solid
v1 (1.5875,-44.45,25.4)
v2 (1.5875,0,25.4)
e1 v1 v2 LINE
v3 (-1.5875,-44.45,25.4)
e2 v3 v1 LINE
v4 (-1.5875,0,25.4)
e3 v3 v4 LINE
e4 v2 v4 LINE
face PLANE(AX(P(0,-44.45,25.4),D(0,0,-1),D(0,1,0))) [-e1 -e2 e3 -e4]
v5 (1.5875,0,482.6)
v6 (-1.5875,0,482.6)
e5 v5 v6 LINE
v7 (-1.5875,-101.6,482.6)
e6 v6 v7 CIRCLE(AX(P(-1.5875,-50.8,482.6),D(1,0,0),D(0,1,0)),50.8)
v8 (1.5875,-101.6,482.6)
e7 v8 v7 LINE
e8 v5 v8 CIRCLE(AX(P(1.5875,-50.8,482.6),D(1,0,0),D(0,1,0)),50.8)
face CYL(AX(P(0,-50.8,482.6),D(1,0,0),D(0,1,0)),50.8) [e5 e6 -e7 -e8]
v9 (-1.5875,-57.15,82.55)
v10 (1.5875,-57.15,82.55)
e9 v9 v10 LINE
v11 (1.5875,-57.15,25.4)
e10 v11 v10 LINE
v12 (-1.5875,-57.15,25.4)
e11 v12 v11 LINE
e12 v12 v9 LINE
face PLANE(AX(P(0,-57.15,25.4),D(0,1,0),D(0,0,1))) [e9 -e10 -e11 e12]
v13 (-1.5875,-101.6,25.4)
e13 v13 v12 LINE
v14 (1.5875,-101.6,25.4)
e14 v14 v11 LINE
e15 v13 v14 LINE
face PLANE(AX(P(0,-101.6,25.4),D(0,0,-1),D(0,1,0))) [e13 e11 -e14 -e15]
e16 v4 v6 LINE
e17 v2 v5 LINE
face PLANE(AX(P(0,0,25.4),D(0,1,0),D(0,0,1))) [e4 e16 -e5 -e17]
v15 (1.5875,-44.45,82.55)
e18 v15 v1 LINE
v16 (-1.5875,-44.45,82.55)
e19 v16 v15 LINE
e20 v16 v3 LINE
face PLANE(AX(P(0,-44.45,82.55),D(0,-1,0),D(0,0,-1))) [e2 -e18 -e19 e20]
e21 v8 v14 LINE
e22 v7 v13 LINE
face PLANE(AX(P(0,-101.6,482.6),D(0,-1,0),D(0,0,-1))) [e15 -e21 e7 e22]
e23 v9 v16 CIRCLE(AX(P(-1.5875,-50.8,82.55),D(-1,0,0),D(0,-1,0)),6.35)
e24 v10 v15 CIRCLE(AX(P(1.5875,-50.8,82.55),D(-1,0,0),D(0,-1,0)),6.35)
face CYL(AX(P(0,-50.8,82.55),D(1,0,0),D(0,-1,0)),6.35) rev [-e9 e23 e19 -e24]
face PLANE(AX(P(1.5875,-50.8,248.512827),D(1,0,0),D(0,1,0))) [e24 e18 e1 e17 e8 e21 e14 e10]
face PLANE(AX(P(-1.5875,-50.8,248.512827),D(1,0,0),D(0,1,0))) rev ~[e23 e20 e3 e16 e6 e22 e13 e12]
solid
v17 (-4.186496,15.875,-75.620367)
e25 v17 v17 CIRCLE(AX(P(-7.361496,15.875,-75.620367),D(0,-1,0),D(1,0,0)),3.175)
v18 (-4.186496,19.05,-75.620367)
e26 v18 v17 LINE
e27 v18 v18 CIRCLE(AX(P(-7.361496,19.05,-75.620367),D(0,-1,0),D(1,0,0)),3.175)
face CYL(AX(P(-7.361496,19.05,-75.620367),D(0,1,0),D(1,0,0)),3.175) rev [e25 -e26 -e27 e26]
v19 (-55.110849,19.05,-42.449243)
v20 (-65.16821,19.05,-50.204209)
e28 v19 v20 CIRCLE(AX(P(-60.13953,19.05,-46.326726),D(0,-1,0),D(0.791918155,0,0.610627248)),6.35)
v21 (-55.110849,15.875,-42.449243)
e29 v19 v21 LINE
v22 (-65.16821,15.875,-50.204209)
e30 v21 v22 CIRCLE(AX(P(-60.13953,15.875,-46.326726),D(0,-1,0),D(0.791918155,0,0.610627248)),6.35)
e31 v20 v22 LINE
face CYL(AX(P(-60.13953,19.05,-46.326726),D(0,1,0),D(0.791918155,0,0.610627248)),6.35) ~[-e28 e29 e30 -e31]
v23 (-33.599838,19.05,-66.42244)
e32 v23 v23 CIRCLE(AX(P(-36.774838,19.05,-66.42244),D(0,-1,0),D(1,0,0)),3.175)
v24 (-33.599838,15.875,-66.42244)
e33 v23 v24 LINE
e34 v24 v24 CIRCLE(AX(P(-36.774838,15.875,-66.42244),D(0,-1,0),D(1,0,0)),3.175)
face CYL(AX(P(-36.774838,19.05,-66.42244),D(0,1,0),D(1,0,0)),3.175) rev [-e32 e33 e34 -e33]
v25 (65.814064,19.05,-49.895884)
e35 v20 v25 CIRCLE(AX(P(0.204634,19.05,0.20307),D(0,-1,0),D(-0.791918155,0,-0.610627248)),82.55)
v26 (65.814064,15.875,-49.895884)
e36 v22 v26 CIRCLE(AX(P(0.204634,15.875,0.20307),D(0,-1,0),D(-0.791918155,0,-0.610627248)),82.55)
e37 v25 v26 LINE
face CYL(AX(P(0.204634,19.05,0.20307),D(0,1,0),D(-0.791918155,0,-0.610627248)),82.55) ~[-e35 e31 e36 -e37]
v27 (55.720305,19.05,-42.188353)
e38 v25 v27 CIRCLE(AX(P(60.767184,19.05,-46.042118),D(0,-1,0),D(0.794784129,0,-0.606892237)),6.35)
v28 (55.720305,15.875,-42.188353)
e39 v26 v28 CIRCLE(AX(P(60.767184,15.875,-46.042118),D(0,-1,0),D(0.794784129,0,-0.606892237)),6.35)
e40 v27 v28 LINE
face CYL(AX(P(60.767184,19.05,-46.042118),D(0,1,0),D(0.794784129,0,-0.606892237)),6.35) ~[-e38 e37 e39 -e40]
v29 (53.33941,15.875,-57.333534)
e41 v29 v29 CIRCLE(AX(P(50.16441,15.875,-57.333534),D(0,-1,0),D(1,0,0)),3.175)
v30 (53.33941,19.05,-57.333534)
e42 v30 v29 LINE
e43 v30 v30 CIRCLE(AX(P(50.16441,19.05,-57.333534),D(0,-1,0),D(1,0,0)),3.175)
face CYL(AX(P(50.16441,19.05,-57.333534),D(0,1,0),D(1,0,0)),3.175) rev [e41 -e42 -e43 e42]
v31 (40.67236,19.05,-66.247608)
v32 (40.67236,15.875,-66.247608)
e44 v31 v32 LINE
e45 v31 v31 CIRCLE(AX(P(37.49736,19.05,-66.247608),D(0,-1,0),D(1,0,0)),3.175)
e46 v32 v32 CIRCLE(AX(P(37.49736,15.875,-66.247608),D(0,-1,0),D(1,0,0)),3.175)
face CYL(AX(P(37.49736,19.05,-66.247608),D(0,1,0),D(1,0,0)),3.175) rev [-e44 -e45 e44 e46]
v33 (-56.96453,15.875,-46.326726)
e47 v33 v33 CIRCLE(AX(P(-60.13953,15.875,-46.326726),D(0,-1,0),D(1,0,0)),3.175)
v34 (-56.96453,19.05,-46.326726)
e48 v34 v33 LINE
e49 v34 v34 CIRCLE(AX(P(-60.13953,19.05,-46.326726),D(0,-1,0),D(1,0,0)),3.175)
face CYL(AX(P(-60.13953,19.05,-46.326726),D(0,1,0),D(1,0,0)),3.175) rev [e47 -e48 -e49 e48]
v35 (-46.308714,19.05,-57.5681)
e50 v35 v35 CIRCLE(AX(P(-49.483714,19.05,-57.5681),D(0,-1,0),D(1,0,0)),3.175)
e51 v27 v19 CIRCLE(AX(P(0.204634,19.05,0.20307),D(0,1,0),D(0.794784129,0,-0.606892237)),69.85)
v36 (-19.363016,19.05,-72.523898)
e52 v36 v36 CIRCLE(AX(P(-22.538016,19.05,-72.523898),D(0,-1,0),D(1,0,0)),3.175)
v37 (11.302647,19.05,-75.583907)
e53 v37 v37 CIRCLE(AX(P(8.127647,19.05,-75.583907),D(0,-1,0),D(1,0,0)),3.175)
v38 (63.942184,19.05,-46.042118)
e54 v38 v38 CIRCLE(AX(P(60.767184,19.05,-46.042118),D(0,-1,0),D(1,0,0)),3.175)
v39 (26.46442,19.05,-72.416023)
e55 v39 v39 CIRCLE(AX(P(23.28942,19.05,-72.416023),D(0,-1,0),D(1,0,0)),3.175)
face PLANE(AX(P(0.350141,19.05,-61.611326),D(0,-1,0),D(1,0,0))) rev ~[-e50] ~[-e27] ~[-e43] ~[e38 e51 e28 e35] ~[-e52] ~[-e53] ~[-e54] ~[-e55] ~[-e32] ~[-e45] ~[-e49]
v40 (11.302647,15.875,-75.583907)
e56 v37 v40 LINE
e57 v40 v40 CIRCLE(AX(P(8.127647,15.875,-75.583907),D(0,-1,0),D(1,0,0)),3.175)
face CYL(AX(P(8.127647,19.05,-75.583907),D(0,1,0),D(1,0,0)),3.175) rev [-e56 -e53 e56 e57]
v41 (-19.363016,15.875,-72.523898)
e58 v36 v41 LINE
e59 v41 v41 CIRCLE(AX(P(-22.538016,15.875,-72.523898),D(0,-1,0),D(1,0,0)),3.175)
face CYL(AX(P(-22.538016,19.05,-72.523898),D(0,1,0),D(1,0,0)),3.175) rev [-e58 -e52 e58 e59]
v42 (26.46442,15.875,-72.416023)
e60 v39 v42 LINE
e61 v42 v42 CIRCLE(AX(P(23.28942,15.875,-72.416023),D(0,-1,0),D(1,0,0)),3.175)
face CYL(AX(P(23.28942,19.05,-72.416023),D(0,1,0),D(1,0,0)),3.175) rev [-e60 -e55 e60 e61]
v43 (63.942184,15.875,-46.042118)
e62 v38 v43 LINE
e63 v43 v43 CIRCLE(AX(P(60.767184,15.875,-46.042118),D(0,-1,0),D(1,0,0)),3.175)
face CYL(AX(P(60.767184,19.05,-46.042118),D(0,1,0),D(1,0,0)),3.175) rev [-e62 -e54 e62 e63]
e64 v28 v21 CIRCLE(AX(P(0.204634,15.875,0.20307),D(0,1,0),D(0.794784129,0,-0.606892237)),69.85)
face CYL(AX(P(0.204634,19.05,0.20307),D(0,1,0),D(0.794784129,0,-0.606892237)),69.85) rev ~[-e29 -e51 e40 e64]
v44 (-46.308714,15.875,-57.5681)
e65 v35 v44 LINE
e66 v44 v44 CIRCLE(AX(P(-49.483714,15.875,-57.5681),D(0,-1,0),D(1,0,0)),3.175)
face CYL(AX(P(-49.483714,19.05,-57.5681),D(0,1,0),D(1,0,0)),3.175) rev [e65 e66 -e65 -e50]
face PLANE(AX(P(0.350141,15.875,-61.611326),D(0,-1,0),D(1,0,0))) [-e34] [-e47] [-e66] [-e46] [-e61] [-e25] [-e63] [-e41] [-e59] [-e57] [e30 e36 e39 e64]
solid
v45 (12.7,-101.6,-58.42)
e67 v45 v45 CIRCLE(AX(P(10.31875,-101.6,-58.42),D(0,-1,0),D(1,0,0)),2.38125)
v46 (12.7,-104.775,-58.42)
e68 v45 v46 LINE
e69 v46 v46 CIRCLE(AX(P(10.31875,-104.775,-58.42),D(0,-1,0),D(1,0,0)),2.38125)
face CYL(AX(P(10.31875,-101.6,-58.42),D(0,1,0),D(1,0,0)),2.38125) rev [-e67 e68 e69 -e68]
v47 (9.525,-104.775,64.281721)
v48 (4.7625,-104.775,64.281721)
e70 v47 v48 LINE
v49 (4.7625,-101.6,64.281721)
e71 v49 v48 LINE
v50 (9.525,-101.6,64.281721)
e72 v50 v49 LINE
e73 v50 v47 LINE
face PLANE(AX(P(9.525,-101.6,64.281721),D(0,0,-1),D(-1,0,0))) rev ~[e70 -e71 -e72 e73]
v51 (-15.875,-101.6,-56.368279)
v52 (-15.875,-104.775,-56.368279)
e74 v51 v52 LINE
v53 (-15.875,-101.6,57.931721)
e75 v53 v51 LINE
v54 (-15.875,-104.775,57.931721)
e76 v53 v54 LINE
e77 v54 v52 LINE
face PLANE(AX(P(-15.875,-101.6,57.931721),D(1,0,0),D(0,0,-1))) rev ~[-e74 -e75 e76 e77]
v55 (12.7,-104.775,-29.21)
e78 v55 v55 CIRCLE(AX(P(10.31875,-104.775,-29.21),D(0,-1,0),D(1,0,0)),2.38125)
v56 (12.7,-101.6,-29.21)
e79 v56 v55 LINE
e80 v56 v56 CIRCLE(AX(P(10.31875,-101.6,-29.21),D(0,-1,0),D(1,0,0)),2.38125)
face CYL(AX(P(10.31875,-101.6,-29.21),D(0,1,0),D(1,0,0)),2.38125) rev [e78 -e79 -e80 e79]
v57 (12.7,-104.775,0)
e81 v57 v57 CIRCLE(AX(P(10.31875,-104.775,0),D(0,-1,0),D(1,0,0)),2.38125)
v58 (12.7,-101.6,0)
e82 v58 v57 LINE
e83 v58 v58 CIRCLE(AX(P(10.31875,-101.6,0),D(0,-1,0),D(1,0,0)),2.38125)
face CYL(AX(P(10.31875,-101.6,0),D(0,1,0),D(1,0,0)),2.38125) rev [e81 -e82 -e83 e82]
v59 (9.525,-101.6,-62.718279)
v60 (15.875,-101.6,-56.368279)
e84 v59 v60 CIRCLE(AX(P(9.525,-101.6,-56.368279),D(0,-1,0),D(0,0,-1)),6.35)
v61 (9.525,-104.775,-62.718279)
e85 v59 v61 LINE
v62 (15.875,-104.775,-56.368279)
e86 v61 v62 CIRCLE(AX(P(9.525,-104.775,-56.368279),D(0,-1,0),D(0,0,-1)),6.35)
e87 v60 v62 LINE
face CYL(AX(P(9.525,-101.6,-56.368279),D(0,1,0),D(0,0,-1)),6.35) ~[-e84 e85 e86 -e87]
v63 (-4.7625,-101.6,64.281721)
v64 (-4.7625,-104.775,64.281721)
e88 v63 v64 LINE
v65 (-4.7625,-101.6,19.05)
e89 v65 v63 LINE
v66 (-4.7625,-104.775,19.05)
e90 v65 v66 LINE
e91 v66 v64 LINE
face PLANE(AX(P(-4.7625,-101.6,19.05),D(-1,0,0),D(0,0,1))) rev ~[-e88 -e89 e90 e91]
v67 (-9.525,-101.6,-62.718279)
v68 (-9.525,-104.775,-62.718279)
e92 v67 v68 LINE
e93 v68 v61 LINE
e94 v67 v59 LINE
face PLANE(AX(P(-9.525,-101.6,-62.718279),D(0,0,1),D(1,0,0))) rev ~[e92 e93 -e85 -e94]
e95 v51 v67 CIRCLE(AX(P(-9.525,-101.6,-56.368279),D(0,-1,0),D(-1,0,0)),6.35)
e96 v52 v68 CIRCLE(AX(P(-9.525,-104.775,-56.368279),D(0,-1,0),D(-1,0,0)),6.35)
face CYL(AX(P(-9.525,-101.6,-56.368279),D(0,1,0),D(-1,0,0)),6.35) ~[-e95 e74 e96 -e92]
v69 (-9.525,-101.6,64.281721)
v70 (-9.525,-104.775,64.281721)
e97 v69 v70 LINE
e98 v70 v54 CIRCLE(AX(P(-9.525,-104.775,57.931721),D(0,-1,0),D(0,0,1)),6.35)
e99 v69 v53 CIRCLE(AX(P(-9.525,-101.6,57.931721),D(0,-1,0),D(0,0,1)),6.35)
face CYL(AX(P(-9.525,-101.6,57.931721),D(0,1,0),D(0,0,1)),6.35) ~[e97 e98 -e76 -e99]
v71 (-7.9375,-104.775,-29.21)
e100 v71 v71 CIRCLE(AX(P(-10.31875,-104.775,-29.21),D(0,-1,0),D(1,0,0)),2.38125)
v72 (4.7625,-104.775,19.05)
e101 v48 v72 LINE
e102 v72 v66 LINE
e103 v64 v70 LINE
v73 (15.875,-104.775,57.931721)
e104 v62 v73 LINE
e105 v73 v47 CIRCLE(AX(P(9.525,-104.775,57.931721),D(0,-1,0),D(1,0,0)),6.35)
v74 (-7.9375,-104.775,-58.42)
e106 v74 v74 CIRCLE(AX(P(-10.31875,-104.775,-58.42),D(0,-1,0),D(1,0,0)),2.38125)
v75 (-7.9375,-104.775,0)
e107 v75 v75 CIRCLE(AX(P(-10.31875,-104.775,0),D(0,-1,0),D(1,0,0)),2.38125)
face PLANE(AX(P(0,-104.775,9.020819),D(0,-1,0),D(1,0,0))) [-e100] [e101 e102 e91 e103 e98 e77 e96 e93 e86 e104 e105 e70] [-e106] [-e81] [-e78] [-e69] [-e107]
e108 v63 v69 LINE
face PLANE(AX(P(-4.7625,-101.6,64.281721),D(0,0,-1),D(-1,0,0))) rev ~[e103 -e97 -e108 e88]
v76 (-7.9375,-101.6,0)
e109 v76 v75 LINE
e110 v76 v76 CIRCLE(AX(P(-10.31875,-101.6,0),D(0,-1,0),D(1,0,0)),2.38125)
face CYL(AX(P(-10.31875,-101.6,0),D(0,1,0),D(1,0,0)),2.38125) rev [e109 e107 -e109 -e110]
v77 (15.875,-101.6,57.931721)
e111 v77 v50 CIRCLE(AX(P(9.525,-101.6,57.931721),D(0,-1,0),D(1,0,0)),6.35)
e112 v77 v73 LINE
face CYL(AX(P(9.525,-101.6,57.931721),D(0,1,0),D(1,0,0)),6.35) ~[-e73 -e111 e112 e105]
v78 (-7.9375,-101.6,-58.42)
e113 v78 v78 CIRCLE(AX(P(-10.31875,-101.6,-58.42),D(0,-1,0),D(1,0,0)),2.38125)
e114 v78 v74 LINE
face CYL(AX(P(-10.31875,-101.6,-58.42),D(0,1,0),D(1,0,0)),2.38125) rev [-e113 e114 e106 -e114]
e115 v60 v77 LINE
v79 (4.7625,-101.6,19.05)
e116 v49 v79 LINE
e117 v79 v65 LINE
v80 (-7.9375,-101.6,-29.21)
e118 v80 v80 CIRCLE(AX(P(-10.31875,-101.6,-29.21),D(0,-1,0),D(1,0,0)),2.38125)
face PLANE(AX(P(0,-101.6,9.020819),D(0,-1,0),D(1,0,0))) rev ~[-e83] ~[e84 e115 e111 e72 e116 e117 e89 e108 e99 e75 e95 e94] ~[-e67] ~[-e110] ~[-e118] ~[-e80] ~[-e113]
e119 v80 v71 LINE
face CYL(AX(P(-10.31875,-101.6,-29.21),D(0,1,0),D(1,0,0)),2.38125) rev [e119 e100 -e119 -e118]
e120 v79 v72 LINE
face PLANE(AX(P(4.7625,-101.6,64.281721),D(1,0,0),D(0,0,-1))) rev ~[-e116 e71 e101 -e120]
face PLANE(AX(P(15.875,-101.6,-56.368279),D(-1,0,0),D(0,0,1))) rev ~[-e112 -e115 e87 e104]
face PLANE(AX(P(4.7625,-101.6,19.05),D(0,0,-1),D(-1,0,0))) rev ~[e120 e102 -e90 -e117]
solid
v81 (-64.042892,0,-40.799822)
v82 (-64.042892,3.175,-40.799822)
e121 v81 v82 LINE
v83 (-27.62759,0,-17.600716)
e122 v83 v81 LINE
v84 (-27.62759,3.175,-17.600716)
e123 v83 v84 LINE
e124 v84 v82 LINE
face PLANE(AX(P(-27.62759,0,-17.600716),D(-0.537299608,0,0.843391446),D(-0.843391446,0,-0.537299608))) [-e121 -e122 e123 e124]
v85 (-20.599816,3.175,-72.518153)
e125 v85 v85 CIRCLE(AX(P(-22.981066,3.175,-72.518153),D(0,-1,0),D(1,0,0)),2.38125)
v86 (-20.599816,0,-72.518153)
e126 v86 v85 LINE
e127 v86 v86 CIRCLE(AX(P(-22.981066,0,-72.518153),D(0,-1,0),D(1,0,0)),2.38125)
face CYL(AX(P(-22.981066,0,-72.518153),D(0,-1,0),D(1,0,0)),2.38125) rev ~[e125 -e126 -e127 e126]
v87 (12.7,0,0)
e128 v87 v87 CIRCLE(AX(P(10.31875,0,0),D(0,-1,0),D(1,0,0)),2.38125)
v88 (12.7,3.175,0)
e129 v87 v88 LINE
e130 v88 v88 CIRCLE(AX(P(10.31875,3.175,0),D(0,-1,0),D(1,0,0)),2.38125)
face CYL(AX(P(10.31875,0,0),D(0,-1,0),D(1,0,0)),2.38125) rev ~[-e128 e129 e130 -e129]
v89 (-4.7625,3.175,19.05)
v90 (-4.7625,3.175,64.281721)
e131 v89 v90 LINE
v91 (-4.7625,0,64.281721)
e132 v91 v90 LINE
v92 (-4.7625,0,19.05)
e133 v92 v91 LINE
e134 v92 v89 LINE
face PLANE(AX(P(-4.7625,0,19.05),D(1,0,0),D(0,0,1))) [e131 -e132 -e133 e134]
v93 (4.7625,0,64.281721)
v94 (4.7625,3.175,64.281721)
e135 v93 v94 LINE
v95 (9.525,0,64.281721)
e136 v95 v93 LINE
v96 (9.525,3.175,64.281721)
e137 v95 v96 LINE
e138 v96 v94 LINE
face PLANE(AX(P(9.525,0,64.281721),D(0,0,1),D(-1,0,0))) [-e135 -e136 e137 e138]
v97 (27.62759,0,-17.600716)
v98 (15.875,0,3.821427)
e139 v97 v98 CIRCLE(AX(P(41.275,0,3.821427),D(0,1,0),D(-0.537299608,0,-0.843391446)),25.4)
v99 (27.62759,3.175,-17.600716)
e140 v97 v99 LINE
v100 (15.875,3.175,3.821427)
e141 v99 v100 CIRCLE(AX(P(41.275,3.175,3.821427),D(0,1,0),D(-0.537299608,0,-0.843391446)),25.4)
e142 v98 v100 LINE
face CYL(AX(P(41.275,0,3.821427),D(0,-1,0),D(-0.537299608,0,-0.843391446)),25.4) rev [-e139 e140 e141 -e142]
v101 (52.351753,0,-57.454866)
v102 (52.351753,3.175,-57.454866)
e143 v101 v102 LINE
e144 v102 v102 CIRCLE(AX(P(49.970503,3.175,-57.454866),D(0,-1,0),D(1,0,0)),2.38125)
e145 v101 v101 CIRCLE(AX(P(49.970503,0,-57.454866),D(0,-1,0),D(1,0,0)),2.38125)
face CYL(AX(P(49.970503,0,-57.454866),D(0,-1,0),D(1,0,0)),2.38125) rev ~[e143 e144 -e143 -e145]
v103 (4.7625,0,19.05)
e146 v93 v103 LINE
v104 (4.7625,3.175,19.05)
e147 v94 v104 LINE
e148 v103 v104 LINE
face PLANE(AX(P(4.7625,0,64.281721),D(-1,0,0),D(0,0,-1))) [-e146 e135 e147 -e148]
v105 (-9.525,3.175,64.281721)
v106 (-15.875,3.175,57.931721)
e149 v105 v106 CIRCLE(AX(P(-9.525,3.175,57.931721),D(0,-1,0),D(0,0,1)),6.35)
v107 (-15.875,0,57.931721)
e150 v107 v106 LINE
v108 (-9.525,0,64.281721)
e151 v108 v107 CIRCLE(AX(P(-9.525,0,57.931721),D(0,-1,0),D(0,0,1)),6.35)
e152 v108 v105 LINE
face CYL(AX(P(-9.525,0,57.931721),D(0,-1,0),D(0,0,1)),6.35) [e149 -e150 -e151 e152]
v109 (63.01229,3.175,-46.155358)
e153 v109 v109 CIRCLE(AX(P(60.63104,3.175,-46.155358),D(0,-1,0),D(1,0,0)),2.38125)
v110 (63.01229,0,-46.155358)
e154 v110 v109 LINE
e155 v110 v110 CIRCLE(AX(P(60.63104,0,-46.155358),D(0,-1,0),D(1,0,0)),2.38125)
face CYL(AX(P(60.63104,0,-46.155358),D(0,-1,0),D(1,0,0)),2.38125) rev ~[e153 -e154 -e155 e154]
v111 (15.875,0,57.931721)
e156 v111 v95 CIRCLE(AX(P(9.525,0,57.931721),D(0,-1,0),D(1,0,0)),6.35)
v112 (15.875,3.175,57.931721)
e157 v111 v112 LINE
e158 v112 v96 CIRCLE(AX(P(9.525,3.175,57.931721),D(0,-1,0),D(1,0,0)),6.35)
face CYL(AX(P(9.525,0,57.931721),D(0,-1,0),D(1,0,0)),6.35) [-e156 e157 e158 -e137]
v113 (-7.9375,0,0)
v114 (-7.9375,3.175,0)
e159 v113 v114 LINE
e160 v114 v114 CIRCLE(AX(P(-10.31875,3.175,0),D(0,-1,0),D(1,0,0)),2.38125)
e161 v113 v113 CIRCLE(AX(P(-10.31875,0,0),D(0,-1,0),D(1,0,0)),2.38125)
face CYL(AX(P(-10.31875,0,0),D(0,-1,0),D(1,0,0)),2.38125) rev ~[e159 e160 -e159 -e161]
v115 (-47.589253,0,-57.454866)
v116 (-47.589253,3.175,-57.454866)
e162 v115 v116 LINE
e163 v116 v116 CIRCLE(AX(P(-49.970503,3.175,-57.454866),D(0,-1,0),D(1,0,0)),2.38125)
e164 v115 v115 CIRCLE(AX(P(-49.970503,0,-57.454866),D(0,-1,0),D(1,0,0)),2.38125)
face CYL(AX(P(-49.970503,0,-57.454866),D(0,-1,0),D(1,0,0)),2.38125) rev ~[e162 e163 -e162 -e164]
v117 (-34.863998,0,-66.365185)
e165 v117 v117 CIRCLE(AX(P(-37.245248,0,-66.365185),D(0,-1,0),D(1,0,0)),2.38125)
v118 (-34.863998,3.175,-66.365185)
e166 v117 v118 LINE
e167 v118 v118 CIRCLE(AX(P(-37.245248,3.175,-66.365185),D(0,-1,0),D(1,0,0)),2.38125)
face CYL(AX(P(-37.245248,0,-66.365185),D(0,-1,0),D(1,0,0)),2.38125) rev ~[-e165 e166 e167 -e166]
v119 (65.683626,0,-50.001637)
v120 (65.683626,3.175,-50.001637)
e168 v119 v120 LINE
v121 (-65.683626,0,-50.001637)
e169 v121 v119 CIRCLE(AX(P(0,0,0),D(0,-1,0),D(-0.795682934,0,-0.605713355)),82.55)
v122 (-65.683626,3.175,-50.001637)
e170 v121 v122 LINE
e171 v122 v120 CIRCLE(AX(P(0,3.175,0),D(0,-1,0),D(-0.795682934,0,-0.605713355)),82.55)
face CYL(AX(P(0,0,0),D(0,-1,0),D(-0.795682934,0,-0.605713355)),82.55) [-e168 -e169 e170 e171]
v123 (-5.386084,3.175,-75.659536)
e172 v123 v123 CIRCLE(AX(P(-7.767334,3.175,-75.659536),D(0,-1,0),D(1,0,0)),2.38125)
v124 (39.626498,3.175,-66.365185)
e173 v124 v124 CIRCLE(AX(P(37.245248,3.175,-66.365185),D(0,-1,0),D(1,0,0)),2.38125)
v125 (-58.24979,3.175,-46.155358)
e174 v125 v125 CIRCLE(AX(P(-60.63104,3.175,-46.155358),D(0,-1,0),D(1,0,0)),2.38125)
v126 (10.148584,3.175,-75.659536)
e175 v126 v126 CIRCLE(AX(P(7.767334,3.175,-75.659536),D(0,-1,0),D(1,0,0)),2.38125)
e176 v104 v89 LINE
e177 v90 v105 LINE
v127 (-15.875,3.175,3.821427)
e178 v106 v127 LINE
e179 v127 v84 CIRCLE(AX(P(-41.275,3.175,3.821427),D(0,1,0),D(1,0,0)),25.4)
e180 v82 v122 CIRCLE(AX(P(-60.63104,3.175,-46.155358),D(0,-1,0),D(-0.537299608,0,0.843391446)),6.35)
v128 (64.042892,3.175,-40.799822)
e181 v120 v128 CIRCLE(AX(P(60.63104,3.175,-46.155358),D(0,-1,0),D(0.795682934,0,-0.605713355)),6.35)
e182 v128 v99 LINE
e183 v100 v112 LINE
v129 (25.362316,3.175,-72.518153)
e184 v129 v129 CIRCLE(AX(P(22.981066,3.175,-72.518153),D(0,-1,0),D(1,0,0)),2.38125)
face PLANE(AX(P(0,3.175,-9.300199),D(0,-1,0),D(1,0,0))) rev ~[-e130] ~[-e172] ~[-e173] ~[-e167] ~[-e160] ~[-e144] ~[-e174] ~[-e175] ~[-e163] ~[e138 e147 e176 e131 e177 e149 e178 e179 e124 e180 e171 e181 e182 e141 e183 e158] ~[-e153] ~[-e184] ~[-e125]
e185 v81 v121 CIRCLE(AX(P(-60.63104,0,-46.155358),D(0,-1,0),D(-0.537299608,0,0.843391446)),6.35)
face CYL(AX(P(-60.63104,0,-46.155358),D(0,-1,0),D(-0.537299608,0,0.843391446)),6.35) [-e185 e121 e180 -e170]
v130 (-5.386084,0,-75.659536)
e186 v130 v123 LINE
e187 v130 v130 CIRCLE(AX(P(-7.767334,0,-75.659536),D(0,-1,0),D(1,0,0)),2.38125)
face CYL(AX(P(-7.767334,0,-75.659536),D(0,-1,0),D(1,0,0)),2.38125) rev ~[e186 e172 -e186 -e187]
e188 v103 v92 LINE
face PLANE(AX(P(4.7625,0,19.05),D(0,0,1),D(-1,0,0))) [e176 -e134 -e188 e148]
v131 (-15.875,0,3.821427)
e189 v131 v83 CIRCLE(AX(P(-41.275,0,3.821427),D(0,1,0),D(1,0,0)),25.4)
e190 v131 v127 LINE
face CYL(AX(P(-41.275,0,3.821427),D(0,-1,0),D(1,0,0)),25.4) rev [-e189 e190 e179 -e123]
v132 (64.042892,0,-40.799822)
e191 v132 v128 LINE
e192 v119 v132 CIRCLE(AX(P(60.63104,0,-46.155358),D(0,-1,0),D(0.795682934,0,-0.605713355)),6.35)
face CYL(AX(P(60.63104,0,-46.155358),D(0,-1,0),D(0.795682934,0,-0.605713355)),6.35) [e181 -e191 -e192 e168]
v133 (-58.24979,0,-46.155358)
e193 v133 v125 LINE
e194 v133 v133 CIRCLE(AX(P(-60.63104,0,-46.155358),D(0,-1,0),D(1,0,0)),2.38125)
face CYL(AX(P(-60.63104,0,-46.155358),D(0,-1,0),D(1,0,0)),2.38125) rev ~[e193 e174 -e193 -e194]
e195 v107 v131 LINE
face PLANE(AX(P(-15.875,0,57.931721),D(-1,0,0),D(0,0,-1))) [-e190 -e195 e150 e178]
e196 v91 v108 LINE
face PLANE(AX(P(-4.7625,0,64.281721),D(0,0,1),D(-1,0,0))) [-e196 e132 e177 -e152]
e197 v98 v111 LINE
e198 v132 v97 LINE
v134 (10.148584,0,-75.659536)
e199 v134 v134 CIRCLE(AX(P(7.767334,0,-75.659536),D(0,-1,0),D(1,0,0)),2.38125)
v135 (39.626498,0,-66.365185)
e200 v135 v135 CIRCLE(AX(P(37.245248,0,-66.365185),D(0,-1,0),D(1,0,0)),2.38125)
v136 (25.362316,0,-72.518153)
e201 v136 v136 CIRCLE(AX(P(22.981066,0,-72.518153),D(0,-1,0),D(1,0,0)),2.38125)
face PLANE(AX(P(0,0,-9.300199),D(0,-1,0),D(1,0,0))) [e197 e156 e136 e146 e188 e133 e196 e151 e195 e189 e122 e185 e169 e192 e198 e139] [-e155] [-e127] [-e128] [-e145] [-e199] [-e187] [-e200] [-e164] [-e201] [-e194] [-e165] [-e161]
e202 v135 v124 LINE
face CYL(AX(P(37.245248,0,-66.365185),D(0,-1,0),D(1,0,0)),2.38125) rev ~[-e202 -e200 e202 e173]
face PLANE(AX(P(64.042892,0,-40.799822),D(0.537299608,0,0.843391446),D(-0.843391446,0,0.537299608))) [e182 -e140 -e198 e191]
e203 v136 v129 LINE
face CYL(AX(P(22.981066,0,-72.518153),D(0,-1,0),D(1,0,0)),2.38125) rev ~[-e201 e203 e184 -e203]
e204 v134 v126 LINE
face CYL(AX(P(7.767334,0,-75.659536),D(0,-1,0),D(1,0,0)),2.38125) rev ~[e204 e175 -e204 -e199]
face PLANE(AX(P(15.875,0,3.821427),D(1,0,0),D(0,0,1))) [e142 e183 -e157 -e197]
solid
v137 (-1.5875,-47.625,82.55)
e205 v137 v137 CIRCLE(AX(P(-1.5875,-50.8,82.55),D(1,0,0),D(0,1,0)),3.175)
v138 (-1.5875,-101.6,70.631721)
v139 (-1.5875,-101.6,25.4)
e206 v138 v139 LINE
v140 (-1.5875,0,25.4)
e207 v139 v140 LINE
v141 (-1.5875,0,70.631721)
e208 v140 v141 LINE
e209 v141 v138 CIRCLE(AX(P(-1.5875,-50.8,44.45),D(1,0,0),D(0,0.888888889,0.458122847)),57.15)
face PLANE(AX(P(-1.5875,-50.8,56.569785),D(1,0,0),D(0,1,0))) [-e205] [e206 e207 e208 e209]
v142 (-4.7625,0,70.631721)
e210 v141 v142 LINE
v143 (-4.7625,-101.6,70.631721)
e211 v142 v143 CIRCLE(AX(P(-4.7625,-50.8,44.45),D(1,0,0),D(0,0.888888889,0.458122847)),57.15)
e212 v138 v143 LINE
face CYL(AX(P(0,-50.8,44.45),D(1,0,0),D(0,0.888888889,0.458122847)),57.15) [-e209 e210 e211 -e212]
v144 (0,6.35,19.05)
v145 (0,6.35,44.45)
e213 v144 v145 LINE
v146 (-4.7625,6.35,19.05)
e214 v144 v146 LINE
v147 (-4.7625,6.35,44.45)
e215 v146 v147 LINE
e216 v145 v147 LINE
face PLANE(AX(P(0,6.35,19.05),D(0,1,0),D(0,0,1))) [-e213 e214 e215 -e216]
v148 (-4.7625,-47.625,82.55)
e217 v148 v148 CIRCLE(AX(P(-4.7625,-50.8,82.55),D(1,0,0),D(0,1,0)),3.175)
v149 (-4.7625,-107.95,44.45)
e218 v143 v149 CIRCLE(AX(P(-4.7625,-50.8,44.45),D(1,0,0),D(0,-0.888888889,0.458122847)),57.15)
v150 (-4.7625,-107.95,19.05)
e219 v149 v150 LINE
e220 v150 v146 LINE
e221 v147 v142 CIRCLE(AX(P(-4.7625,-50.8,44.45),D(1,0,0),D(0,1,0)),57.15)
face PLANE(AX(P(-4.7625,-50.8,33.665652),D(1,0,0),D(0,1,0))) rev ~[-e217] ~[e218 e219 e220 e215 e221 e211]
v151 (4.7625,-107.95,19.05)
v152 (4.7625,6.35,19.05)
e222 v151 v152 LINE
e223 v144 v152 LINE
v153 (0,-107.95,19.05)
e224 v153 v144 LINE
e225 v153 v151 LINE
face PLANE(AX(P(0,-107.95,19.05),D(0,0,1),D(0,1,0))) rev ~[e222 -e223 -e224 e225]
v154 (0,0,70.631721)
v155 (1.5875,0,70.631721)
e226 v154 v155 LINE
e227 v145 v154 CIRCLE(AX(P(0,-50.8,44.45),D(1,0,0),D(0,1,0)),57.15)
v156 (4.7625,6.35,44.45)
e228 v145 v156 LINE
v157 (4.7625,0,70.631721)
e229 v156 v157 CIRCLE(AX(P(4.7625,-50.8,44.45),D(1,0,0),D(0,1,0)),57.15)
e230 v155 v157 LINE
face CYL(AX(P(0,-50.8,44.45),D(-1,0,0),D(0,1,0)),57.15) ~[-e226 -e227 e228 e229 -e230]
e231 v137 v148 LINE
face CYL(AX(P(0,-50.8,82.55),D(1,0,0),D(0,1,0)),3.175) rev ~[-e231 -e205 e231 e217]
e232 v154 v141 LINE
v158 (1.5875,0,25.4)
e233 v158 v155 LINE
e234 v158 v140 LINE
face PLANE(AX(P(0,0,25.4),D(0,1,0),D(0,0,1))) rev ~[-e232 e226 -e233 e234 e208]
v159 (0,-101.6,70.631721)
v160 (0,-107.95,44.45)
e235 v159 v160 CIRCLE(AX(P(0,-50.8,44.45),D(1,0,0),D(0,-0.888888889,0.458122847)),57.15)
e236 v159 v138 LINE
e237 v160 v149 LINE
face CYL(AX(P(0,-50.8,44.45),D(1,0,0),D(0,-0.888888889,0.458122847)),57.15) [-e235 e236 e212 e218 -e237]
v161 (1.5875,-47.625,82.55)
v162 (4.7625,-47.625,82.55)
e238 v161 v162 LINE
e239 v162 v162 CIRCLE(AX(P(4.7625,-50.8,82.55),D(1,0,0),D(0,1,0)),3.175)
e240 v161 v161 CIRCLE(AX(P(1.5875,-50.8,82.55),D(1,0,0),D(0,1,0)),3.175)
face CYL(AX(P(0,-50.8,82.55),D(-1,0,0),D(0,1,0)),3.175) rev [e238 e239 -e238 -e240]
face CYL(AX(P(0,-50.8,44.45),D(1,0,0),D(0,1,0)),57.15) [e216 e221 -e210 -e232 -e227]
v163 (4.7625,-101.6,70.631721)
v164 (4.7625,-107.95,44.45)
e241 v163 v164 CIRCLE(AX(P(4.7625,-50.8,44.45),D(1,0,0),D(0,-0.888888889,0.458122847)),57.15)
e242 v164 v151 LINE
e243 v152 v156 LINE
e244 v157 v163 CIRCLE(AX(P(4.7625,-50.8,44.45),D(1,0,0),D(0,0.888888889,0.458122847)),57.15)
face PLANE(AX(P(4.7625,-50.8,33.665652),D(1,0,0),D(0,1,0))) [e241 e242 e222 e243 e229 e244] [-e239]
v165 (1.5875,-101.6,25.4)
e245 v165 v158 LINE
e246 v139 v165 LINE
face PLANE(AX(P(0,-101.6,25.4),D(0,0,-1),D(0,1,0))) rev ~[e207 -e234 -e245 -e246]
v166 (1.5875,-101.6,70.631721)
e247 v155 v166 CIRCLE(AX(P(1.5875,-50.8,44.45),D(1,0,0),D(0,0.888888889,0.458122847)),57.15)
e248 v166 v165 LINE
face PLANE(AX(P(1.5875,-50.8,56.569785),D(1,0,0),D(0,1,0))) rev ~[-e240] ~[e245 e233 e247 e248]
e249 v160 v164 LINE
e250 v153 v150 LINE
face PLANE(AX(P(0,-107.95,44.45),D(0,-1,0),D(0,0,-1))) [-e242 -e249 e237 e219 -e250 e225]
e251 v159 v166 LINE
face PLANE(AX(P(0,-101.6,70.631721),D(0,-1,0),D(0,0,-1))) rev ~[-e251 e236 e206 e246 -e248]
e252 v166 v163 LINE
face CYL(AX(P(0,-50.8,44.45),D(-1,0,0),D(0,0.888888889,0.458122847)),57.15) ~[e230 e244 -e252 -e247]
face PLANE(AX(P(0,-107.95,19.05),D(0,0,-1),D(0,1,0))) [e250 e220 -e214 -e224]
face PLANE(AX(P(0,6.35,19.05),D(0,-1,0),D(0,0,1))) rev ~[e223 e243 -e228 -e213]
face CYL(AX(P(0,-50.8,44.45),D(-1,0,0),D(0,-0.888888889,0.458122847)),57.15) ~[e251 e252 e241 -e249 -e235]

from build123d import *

# Parameters (mm, degrees)
F2_R      = 3.175
F6_DEPTH  = 4.7625
F7_DEPTH  = 1.5875
F3_R      = 2.38125
F8_DEPTH  = 3.175
F4_R      = 2.38125
F9_DEPTH  = 3.175
F5_R      = 3.175
F10_DEPTH = 3.175
F12_DEPTH = 1.5875


# Not quite as in the source:
# - a length typed as a fraction of an inch, garbled in the dataset ("3 / 203.2 mm" for 3/8 in), is restored
# - a feature names something its author has since deleted; it is built from what else it names


with BuildPart() as f6:
    # F2 (on Right) → F6 (new body, symmetric)
    with BuildSketch(Plane.YZ):
        with BuildLine():
            Line((-107.95, 44.45), (-107.95, 19.05))
            Line((-107.95, 19.05), (6.35, 19.05))
            Line((6.35, 19.05), (6.35, 44.45))
            ThreePointArc((6.35, 44.45), (4.7398167984, 57.9203841816), (0, 70.6317207227))
            Line((0, 70.6317207227), (0, 25.4))
            Line((0, 25.4), (-101.6, 25.4))
            Line((-101.6, 25.4), (-101.6, 70.6317207227))
            ThreePointArc((-101.6, 70.6317207227), (-106.3398167984, 57.9203841816), (-107.95, 44.45))
        make_face()
        with BuildLine():
            ThreePointArc((0, 70.6317207227), (-50.8, 101.6), (-101.6, 70.6317207227))
            Line((-101.6, 70.6317207227), (-101.6, 25.4))
            Line((-101.6, 25.4), (0, 25.4))
            Line((0, 25.4), (0, 70.6317207227))
        make_face()
        with Locations((-50.8, 82.55)):
            Circle(F2_R, mode=Mode.SUBTRACT)
    extrude(amount=F6_DEPTH, both=True)

    # F2 (on Right) → F7 (cut, symmetric)
    with BuildSketch(Plane.YZ):
        with BuildLine():
            ThreePointArc((0, 70.6317207227), (-50.8, 101.6), (-101.6, 70.6317207227))
            Line((-101.6, 70.6317207227), (-101.6, 25.4))
            Line((-101.6, 25.4), (0, 25.4))
            Line((0, 25.4), (0, 70.6317207227))
        make_face()
        with Locations((-50.8, 82.55)):
            Circle(F2_R, mode=Mode.SUBTRACT)
    extrude(amount=F7_DEPTH, both=True, mode=Mode.SUBTRACT)


with BuildPart() as f8:
    # F3 (on offset) → F8 (new body)
    with BuildSketch(Plane.XZ.offset(101.6)):
        with BuildLine():
            Line((-4.7625, 64.2817207227), (-9.525, 64.2817207227))
            ThreePointArc((-9.525, 64.2817207227), (-14.0151280605, 62.4218487832), (-15.875, 57.9317207227))
            Line((-15.875, 57.9317207227), (-15.875, -56.3682792773))
            ThreePointArc((-15.875, -56.3682792773), (-14.0151280605, -60.8584073379), (-9.525, -62.7182792773))
            Line((-9.525, -62.7182792773), (9.525, -62.7182792773))
            ThreePointArc((9.525, -62.7182792773), (14.0151280605, -60.8584073379), (15.875, -56.3682792773))
            Line((15.875, -56.3682792773), (15.875, 57.9317207227))
            ThreePointArc((15.875, 57.9317207227), (14.0151280605, 62.4218487832), (9.525, 64.2817207227))
            Line((9.525, 64.2817207227), (4.7625, 64.2817207227))
            Line((4.7625, 64.2817207227), (4.7625, 19.05))
            Line((4.7625, 19.05), (-4.7625, 19.05))
            Line((-4.7625, 19.05), (-4.7625, 64.2817207227))
        make_face()
        with Locations((-10.31875, -58.42)):
            Circle(F3_R, mode=Mode.SUBTRACT)
        with Locations((-10.31875, -29.21)):
            Circle(F3_R, mode=Mode.SUBTRACT)
        with Locations((-10.31875, 0)):
            Circle(F3_R, mode=Mode.SUBTRACT)
        with Locations((10.31875, -58.42)):
            Circle(F3_R, mode=Mode.SUBTRACT)
        with Locations((10.31875, -29.21)):
            Circle(F3_R, mode=Mode.SUBTRACT)
        with Locations((10.31875, 0)):
            Circle(F3_R, mode=Mode.SUBTRACT)
    extrude(amount=F8_DEPTH)


with BuildPart() as f9:
    # F4 (on Front) → F9 (new body)
    with BuildSketch(Plane.XZ):
        with BuildLine():
            Line((4.7625, 19.05), (-4.7625, 19.05))
            Line((-4.7625, 19.05), (-4.7625, 64.2817207227))
            Line((-4.7625, 64.2817207227), (-9.525, 64.2817207227))
            ThreePointArc((-9.525, 64.2817207227), (-14.0151280605, 62.4218487832), (-15.875, 57.9317207227))
            Line((-15.875, 57.9317207227), (-15.875, 3.82142679))
            ThreePointArc((-15.875, 3.82142679), (-19.006140405, -8.3956879406), (-27.627589948, -17.6007159336))
            Line((-27.627589948, -17.6007159336), (-64.0428920913, -40.7998219675))
            ThreePointArc((-64.0428920913, -40.7998219675), (-66.8824421859, -45.0406983115), (-65.6836262099, -50.0016374524))
            ThreePointArc((-65.6836262099, -50.0016374524), (0, -82.55), (65.6836262099, -50.0016374524))
            ThreePointArc((65.6836262099, -50.0016374524), (66.8824421859, -45.0406983115), (64.0428920913, -40.7998219675))
            Line((64.0428920913, -40.7998219675), (27.627589948, -17.6007159336))
            ThreePointArc((27.627589948, -17.6007159336), (19.006140405, -8.3956879406), (15.875, 3.82142679))
            Line((15.875, 3.82142679), (15.875, 57.9317207227))
            ThreePointArc((15.875, 57.9317207227), (14.0151280605, 62.4218487832), (9.525, 64.2817207227))
            Line((9.525, 64.2817207227), (4.7625, 64.2817207227))
            Line((4.7625, 64.2817207227), (4.7625, 19.05))
        make_face()
        with Locations((-37.2452482367, -66.3651854355)):
            Circle(F4_R, mode=Mode.SUBTRACT)
        with Locations((-60.6310395783, -46.1553576484)):
            Circle(F4_R, mode=Mode.SUBTRACT)
        with Locations((-49.9705034386, -57.4548658175)):
            Circle(F4_R, mode=Mode.SUBTRACT)
        with Locations((-22.9810656932, -72.5181531761)):
            Circle(F4_R, mode=Mode.SUBTRACT)
        with Locations((-7.767334093, -75.6595360637)):
            Circle(F4_R, mode=Mode.SUBTRACT)
        with Locations((7.767334093, -75.6595360637)):
            Circle(F4_R, mode=Mode.SUBTRACT)
        with Locations((22.9810656932, -72.5181531761)):
            Circle(F4_R, mode=Mode.SUBTRACT)
        with Locations((37.2452482367, -66.3651854355)):
            Circle(F4_R, mode=Mode.SUBTRACT)
        with Locations((49.9705034386, -57.4548658175)):
            Circle(F4_R, mode=Mode.SUBTRACT)
        with Locations((60.6310395783, -46.1553576484)):
            Circle(F4_R, mode=Mode.SUBTRACT)
        with Locations((-10.31875, 0)):
            Circle(F4_R, mode=Mode.SUBTRACT)
        with Locations((10.31875, 0)):
            Circle(F4_R, mode=Mode.SUBTRACT)
    extrude(amount=-F9_DEPTH)


with BuildPart() as f10:
    # F5 (on offset) → F10 (new body)
    with BuildSketch(Plane.XZ.offset(-19.05)):
        with BuildLine():
            ThreePointArc((-55.1108494471, -42.4492432133), (-64.0170127547, -41.2980459505), (-65.1682100175, -50.2042092581))
            ThreePointArc((-65.1682100175, -50.2042092581), (0.398951337, -82.3467012608), (65.8140635748, -49.8958841502))
            ThreePointArc((65.8140635748, -49.8958841502), (64.6209500594, -40.9952392219), (55.7203051311, -42.1883527374))
            ThreePointArc((55.7203051311, -42.1883527374), (0.3690563144, -69.6467364464), (-55.1108494471, -42.4492432133))
        make_face()
        with Locations((-22.5380164103, -72.5238979115)):
            Circle(F5_R, mode=Mode.SUBTRACT)
        with Locations((-7.361496499, -75.6203674646)):
            Circle(F5_R, mode=Mode.SUBTRACT)
        with Locations((-36.7748383006, -66.4224404811)):
            Circle(F5_R, mode=Mode.SUBTRACT)
        with Locations((8.127646503, -75.5839068692)):
            Circle(F5_R, mode=Mode.SUBTRACT)
        with Locations((23.2894204681, -72.4160226316)):
            Circle(F5_R, mode=Mode.SUBTRACT)
        with Locations((37.4973597502, -66.2476077893)):
            Circle(F5_R, mode=Mode.SUBTRACT)
        with Locations((-49.4837143934, -57.5680998072)):
            Circle(F5_R, mode=Mode.SUBTRACT)
        with Locations((-60.1395297323, -46.3267262357)):
            Circle(F5_R, mode=Mode.SUBTRACT)
        with Locations((50.1644099662, -57.3335335728)):
            Circle(F5_R, mode=Mode.SUBTRACT)
        with Locations((60.767184353, -46.0421184438)):
            Circle(F5_R, mode=Mode.SUBTRACT)
    extrude(amount=F10_DEPTH)


with BuildPart() as f12:
    # F11 (on Right) → F12 (new body, symmetric)
    with BuildSketch(Plane.YZ):
        with BuildLine():
            Line((-101.6, 482.6), (-101.6, 25.4))
            Line((-101.6, 25.4), (-57.15, 25.4))
            Line((-57.15, 25.4), (-57.15, 82.55))
            ThreePointArc((-57.15, 82.55), (-50.8, 88.9), (-44.45, 82.55))
            Line((-44.45, 82.55), (-44.45, 25.4))
            Line((-44.45, 25.4), (0, 25.4))
            Line((0, 25.4), (0, 482.6))
            ThreePointArc((0, 482.6), (-50.8, 533.4), (-101.6, 482.6))
        make_face()
    extrude(amount=F12_DEPTH, both=True)


solid = Compound([f6.part, f8.part, f9.part, f10.part, f12.part])
